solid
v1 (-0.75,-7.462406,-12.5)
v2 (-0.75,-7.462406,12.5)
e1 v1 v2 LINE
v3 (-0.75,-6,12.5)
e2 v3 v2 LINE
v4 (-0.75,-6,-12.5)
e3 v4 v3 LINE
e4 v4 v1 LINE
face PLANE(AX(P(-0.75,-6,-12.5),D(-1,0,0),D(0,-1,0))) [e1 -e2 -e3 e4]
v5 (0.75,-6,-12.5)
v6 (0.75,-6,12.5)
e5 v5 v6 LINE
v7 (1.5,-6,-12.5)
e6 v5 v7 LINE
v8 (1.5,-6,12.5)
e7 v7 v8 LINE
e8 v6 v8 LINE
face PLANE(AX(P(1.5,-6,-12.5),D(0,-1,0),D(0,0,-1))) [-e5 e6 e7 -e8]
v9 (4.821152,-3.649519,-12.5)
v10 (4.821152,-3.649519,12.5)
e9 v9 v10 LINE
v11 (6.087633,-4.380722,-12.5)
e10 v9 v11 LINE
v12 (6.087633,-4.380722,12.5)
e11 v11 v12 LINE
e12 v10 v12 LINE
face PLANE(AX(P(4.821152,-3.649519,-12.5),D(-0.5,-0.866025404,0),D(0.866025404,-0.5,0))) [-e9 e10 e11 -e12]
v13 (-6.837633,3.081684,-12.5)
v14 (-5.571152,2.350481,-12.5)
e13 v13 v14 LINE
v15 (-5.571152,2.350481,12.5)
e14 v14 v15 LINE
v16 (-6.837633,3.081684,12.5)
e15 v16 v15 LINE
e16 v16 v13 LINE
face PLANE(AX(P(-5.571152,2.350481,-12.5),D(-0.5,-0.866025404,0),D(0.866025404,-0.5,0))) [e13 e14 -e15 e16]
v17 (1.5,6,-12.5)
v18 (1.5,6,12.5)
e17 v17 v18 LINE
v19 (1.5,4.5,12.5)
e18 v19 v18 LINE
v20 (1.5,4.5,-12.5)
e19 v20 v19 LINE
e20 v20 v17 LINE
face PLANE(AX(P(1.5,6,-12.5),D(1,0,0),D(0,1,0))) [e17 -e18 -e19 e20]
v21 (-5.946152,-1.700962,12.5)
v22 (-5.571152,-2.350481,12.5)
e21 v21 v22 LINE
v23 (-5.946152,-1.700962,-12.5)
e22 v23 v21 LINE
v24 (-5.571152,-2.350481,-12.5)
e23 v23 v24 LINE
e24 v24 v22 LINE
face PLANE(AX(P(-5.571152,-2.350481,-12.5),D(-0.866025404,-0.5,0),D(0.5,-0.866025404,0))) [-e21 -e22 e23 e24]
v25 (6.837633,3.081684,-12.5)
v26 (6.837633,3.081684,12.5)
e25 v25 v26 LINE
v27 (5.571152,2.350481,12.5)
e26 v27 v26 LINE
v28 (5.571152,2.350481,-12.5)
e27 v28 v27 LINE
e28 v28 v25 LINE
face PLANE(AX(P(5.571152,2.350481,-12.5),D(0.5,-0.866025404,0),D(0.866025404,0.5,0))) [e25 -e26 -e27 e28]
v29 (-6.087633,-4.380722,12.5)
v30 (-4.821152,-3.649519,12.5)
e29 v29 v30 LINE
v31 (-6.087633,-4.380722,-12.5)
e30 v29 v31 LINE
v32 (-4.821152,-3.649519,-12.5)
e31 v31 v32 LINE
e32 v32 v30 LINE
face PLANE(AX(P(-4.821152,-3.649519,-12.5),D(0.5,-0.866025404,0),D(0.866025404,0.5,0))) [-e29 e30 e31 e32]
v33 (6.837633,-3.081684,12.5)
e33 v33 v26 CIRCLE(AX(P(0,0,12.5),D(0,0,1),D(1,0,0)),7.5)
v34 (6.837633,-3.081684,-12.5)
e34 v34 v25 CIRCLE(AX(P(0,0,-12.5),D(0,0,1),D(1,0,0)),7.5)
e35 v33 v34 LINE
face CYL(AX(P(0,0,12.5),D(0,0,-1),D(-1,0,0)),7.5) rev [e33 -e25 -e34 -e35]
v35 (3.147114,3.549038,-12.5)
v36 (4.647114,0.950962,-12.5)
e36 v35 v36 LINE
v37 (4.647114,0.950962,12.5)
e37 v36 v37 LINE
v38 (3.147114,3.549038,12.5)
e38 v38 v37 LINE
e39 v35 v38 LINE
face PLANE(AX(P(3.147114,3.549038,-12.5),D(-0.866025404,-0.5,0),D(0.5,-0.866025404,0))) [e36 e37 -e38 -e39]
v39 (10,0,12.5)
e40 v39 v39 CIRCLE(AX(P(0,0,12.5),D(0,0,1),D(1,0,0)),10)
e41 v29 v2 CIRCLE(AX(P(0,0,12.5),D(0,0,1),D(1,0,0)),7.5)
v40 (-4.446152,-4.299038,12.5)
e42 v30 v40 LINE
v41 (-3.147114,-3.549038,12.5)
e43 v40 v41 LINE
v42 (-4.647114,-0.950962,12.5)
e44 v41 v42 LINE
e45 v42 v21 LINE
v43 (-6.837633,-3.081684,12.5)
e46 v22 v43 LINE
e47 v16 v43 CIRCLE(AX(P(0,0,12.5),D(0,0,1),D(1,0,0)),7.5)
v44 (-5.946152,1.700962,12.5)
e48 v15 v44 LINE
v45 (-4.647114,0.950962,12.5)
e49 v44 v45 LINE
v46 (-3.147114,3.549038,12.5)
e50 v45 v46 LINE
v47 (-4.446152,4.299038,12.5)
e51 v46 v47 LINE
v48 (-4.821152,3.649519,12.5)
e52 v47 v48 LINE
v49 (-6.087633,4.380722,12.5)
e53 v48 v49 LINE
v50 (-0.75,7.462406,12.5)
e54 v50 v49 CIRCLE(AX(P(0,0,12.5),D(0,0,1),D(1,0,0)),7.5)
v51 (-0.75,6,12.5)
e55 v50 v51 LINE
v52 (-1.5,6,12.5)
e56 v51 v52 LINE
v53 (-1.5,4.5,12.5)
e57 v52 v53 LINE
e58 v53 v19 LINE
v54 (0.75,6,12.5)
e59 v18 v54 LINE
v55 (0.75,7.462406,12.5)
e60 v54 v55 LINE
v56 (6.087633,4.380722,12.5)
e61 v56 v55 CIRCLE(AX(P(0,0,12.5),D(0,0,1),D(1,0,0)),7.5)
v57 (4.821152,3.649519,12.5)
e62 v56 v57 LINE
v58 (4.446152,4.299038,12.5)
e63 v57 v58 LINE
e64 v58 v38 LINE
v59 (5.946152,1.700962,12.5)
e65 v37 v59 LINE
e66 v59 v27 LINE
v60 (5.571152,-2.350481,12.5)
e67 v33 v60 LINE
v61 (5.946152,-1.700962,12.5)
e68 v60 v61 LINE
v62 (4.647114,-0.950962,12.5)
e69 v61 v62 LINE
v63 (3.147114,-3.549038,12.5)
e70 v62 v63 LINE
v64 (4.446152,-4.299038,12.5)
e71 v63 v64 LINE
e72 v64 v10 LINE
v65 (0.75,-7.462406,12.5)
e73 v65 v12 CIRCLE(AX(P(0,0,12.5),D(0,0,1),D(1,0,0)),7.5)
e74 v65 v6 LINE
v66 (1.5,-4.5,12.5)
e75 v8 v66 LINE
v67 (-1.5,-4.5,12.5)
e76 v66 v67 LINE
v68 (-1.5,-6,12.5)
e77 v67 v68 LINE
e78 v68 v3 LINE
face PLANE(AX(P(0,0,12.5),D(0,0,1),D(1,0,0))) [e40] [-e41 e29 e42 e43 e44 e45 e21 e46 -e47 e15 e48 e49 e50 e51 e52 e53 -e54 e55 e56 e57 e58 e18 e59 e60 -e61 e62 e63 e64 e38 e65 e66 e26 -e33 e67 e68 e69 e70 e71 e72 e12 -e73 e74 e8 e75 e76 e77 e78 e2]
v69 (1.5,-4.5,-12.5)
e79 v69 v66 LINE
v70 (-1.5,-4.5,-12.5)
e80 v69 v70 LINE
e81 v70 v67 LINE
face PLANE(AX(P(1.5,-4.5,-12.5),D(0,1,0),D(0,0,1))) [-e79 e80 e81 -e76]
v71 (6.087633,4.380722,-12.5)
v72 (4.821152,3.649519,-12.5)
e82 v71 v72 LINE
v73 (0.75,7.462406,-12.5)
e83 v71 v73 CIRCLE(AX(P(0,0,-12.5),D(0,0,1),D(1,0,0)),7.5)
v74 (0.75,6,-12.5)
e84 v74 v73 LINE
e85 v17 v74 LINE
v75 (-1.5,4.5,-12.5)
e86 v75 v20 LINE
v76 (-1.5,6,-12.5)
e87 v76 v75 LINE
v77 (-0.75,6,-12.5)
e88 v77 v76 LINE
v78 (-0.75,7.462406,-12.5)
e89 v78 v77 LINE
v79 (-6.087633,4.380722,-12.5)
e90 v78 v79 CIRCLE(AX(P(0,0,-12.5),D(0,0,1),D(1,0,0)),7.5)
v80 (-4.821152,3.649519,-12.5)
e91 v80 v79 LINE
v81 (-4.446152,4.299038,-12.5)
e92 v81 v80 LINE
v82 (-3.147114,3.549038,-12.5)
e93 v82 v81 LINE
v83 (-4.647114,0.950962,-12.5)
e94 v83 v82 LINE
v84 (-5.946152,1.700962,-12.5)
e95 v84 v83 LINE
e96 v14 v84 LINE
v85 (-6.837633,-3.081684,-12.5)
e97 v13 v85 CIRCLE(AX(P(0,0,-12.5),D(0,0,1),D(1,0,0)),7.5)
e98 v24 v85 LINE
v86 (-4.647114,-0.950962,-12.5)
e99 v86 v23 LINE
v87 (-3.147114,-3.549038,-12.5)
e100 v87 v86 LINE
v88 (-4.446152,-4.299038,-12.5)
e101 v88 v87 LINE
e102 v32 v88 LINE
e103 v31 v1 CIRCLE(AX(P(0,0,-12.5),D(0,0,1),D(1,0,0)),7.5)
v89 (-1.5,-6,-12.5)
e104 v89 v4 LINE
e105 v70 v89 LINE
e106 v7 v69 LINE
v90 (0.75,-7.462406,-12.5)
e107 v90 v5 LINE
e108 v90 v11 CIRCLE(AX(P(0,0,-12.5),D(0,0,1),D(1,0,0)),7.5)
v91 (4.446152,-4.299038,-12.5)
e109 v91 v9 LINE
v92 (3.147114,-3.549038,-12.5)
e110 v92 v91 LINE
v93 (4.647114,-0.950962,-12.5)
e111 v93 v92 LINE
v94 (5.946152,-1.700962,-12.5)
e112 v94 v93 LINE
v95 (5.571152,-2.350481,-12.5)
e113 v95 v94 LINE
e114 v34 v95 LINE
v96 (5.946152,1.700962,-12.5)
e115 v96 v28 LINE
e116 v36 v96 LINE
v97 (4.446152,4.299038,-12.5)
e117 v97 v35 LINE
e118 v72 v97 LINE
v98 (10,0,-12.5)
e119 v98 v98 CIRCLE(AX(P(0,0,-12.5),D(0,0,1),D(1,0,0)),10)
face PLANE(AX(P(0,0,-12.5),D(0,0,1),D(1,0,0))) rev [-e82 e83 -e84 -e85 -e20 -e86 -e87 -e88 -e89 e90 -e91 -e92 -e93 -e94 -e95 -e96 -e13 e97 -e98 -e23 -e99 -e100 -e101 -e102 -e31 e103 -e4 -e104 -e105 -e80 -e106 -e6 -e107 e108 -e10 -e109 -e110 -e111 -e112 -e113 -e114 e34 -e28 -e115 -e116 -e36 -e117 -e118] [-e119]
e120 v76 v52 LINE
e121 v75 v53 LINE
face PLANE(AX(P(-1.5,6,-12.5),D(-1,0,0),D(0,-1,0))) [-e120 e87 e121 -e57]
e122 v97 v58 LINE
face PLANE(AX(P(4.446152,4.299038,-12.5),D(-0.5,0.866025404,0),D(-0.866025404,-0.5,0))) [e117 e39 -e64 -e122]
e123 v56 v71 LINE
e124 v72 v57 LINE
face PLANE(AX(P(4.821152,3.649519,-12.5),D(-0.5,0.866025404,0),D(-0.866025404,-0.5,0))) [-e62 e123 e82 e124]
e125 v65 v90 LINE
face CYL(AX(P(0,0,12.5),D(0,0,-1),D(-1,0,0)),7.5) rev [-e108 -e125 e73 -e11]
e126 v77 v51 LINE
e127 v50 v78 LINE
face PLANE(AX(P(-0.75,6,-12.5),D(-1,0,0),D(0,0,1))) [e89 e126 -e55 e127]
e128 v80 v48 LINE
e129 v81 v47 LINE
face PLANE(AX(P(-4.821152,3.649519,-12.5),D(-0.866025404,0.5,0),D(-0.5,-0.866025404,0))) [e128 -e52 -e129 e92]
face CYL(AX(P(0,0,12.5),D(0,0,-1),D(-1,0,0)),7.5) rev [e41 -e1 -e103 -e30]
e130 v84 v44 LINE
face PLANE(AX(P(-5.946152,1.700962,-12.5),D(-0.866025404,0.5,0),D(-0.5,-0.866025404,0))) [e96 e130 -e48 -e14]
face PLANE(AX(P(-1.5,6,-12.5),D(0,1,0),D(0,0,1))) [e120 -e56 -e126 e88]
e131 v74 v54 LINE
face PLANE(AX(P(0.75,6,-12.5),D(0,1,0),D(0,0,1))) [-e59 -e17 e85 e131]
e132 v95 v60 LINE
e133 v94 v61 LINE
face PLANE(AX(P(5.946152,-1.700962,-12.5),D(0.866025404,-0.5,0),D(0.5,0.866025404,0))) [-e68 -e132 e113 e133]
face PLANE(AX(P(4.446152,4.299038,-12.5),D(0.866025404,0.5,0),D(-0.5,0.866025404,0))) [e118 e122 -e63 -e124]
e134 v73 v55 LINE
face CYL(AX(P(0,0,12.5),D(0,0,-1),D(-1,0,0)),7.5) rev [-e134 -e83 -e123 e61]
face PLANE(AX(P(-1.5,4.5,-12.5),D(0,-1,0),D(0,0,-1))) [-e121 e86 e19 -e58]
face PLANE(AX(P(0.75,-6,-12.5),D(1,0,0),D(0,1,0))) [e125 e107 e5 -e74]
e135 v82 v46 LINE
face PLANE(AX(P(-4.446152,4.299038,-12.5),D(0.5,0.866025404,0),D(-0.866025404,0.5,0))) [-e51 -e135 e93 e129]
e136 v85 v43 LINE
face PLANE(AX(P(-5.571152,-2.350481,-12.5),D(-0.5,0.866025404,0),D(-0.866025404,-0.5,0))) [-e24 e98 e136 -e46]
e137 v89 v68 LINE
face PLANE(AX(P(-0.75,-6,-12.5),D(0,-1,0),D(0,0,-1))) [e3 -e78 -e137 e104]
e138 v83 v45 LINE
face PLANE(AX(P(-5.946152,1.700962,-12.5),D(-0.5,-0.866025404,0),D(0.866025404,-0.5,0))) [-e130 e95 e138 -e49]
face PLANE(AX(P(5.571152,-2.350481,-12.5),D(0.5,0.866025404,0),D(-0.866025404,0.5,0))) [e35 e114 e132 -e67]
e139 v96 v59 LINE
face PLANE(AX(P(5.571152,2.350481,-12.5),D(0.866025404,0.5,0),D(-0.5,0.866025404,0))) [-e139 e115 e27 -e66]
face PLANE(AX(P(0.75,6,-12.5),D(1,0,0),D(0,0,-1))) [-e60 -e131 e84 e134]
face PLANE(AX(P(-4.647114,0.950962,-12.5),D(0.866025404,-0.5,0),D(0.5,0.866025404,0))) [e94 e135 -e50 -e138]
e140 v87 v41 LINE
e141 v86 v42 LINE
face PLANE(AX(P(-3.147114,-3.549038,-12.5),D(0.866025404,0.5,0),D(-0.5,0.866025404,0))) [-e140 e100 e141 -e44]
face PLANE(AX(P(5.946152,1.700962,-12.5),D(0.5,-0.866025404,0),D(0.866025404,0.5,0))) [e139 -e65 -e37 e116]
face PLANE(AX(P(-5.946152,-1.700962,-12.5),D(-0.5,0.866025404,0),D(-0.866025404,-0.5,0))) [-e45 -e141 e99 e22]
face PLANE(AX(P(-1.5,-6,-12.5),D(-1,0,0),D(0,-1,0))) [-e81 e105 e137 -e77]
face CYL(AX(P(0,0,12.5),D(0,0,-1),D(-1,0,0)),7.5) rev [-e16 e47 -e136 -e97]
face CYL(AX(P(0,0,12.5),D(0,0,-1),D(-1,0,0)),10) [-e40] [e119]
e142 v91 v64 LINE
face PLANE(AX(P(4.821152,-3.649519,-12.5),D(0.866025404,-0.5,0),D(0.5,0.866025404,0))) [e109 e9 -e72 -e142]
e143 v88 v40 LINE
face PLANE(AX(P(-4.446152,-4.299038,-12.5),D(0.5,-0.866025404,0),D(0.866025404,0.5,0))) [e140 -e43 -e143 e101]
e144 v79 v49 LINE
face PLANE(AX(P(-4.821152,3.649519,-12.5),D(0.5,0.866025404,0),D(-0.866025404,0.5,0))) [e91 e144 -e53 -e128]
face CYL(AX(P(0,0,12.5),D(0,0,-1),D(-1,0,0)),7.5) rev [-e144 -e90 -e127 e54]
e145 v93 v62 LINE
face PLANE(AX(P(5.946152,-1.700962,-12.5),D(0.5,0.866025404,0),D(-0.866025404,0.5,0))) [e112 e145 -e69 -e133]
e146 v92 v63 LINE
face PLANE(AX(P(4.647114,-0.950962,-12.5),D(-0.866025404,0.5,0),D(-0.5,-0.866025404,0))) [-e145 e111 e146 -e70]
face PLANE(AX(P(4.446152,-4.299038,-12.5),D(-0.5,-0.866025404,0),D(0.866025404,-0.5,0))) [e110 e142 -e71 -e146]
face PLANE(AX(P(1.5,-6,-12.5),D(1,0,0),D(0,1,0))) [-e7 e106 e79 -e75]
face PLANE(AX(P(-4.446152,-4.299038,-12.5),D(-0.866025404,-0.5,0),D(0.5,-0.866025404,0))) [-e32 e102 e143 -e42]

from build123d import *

# Parameters (mm, degrees)
ESBO_O1_R                = 10
RESSALTO_EXTRUS_O1_DEPTH = 12.5
CAVIDADE1_START          = -12.5
CAVIDADE1_DEPTH          = 25


# Read off the part's stored shape, not the designer's step: Cavidade1
with BuildPart() as part:
    # Esboço1 → Ressalto-extrusão1 (new, symmetric)
    with BuildSketch(Plane.XY):
        Circle(ESBO_O1_R)
    extrude(amount=RESSALTO_EXTRUS_O1_DEPTH, both=True)

    # Cavidade1 outline → Cavidade1 (cut)
    with BuildSketch(Plane.XY.offset(CAVIDADE1_START)):
        with BuildLine():
            Line((4.446152423, 4.299038106), (4.821152423, 3.649519053))
            Line((4.821152423, 3.649519053), (6.087632977, 4.380721942))
            ThreePointArc((6.087632977, 4.380721942), (3.75, 6.495190528), (0.75, 7.462405778))
            Line((0.75, 7.462405778), (0.75, 6))
            Line((0.75, 6), (1.5, 6))
            Line((1.5, 6), (1.5, 4.5))
            Line((1.5, 4.5), (-1.5, 4.5))
            Line((-1.5, 4.5), (-1.5, 6))
            Line((-1.5, 6), (-0.75, 6))
            Line((-0.75, 6), (-0.75, 7.462405778))
            ThreePointArc((-0.75, 7.462405778), (-3.75, 6.495190528), (-6.087632977, 4.380721942))
            Line((-6.087632977, 4.380721942), (-4.821152423, 3.649519053))
            Line((-4.821152423, 3.649519053), (-4.446152423, 4.299038106))
            Line((-4.446152423, 4.299038106), (-3.147114317, 3.549038106))
            Line((-3.147114317, 3.549038106), (-4.647114317, 0.950961894))
            Line((-4.647114317, 0.950961894), (-5.946152423, 1.700961894))
            Line((-5.946152423, 1.700961894), (-5.571152423, 2.350480947))
            Line((-5.571152423, 2.350480947), (-6.837632977, 3.081683836))
            ThreePointArc((-6.837632977, 3.081683836), (-7.5, 0), (-6.837632977, -3.081683836))
            Line((-6.837632977, -3.081683836), (-5.571152423, -2.350480947))
            Line((-5.571152423, -2.350480947), (-5.946152423, -1.700961894))
            Line((-5.946152423, -1.700961894), (-4.647114317, -0.950961894))
            Line((-4.647114317, -0.950961894), (-3.147114317, -3.549038106))
            Line((-3.147114317, -3.549038106), (-4.446152423, -4.299038106))
            Line((-4.446152423, -4.299038106), (-4.821152423, -3.649519053))
            Line((-4.821152423, -3.649519053), (-6.087632977, -4.380721942))
            ThreePointArc((-6.087632977, -4.380721942), (-3.75, -6.495190528), (-0.75, -7.462405778))
            Line((-0.75, -7.462405778), (-0.75, -6))
            Line((-0.75, -6), (-1.5, -6))
            Line((-1.5, -6), (-1.5, -4.5))
            Line((-1.5, -4.5), (1.5, -4.5))
            Line((1.5, -4.5), (1.5, -6))
            Line((1.5, -6), (0.75, -6))
            Line((0.75, -6), (0.75, -7.462405778))
            ThreePointArc((0.75, -7.462405778), (3.75, -6.495190528), (6.087632977, -4.380721942))
            Line((6.087632977, -4.380721942), (4.821152423, -3.649519053))
            Line((4.821152423, -3.649519053), (4.446152423, -4.299038106))
            Line((4.446152423, -4.299038106), (3.147114317, -3.549038106))
            Line((3.147114317, -3.549038106), (4.647114317, -0.950961894))
            Line((4.647114317, -0.950961894), (5.946152423, -1.700961894))
            Line((5.946152423, -1.700961894), (5.571152423, -2.350480947))
            Line((5.571152423, -2.350480947), (6.837632977, -3.081683836))
            ThreePointArc((6.837632977, -3.081683836), (7.5, 0), (6.837632977, 3.081683836))
            Line((6.837632977, 3.081683836), (5.571152423, 2.350480947))
            Line((5.571152423, 2.350480947), (5.946152423, 1.700961894))
            Line((5.946152423, 1.700961894), (4.647114317, 0.950961894))
            Line((4.647114317, 0.950961894), (3.147114317, 3.549038106))
            Line((3.147114317, 3.549038106), (4.446152423, 4.299038106))
        make_face()
    extrude(amount=CAVIDADE1_DEPTH, mode=Mode.SUBTRACT)


solid = part.part
